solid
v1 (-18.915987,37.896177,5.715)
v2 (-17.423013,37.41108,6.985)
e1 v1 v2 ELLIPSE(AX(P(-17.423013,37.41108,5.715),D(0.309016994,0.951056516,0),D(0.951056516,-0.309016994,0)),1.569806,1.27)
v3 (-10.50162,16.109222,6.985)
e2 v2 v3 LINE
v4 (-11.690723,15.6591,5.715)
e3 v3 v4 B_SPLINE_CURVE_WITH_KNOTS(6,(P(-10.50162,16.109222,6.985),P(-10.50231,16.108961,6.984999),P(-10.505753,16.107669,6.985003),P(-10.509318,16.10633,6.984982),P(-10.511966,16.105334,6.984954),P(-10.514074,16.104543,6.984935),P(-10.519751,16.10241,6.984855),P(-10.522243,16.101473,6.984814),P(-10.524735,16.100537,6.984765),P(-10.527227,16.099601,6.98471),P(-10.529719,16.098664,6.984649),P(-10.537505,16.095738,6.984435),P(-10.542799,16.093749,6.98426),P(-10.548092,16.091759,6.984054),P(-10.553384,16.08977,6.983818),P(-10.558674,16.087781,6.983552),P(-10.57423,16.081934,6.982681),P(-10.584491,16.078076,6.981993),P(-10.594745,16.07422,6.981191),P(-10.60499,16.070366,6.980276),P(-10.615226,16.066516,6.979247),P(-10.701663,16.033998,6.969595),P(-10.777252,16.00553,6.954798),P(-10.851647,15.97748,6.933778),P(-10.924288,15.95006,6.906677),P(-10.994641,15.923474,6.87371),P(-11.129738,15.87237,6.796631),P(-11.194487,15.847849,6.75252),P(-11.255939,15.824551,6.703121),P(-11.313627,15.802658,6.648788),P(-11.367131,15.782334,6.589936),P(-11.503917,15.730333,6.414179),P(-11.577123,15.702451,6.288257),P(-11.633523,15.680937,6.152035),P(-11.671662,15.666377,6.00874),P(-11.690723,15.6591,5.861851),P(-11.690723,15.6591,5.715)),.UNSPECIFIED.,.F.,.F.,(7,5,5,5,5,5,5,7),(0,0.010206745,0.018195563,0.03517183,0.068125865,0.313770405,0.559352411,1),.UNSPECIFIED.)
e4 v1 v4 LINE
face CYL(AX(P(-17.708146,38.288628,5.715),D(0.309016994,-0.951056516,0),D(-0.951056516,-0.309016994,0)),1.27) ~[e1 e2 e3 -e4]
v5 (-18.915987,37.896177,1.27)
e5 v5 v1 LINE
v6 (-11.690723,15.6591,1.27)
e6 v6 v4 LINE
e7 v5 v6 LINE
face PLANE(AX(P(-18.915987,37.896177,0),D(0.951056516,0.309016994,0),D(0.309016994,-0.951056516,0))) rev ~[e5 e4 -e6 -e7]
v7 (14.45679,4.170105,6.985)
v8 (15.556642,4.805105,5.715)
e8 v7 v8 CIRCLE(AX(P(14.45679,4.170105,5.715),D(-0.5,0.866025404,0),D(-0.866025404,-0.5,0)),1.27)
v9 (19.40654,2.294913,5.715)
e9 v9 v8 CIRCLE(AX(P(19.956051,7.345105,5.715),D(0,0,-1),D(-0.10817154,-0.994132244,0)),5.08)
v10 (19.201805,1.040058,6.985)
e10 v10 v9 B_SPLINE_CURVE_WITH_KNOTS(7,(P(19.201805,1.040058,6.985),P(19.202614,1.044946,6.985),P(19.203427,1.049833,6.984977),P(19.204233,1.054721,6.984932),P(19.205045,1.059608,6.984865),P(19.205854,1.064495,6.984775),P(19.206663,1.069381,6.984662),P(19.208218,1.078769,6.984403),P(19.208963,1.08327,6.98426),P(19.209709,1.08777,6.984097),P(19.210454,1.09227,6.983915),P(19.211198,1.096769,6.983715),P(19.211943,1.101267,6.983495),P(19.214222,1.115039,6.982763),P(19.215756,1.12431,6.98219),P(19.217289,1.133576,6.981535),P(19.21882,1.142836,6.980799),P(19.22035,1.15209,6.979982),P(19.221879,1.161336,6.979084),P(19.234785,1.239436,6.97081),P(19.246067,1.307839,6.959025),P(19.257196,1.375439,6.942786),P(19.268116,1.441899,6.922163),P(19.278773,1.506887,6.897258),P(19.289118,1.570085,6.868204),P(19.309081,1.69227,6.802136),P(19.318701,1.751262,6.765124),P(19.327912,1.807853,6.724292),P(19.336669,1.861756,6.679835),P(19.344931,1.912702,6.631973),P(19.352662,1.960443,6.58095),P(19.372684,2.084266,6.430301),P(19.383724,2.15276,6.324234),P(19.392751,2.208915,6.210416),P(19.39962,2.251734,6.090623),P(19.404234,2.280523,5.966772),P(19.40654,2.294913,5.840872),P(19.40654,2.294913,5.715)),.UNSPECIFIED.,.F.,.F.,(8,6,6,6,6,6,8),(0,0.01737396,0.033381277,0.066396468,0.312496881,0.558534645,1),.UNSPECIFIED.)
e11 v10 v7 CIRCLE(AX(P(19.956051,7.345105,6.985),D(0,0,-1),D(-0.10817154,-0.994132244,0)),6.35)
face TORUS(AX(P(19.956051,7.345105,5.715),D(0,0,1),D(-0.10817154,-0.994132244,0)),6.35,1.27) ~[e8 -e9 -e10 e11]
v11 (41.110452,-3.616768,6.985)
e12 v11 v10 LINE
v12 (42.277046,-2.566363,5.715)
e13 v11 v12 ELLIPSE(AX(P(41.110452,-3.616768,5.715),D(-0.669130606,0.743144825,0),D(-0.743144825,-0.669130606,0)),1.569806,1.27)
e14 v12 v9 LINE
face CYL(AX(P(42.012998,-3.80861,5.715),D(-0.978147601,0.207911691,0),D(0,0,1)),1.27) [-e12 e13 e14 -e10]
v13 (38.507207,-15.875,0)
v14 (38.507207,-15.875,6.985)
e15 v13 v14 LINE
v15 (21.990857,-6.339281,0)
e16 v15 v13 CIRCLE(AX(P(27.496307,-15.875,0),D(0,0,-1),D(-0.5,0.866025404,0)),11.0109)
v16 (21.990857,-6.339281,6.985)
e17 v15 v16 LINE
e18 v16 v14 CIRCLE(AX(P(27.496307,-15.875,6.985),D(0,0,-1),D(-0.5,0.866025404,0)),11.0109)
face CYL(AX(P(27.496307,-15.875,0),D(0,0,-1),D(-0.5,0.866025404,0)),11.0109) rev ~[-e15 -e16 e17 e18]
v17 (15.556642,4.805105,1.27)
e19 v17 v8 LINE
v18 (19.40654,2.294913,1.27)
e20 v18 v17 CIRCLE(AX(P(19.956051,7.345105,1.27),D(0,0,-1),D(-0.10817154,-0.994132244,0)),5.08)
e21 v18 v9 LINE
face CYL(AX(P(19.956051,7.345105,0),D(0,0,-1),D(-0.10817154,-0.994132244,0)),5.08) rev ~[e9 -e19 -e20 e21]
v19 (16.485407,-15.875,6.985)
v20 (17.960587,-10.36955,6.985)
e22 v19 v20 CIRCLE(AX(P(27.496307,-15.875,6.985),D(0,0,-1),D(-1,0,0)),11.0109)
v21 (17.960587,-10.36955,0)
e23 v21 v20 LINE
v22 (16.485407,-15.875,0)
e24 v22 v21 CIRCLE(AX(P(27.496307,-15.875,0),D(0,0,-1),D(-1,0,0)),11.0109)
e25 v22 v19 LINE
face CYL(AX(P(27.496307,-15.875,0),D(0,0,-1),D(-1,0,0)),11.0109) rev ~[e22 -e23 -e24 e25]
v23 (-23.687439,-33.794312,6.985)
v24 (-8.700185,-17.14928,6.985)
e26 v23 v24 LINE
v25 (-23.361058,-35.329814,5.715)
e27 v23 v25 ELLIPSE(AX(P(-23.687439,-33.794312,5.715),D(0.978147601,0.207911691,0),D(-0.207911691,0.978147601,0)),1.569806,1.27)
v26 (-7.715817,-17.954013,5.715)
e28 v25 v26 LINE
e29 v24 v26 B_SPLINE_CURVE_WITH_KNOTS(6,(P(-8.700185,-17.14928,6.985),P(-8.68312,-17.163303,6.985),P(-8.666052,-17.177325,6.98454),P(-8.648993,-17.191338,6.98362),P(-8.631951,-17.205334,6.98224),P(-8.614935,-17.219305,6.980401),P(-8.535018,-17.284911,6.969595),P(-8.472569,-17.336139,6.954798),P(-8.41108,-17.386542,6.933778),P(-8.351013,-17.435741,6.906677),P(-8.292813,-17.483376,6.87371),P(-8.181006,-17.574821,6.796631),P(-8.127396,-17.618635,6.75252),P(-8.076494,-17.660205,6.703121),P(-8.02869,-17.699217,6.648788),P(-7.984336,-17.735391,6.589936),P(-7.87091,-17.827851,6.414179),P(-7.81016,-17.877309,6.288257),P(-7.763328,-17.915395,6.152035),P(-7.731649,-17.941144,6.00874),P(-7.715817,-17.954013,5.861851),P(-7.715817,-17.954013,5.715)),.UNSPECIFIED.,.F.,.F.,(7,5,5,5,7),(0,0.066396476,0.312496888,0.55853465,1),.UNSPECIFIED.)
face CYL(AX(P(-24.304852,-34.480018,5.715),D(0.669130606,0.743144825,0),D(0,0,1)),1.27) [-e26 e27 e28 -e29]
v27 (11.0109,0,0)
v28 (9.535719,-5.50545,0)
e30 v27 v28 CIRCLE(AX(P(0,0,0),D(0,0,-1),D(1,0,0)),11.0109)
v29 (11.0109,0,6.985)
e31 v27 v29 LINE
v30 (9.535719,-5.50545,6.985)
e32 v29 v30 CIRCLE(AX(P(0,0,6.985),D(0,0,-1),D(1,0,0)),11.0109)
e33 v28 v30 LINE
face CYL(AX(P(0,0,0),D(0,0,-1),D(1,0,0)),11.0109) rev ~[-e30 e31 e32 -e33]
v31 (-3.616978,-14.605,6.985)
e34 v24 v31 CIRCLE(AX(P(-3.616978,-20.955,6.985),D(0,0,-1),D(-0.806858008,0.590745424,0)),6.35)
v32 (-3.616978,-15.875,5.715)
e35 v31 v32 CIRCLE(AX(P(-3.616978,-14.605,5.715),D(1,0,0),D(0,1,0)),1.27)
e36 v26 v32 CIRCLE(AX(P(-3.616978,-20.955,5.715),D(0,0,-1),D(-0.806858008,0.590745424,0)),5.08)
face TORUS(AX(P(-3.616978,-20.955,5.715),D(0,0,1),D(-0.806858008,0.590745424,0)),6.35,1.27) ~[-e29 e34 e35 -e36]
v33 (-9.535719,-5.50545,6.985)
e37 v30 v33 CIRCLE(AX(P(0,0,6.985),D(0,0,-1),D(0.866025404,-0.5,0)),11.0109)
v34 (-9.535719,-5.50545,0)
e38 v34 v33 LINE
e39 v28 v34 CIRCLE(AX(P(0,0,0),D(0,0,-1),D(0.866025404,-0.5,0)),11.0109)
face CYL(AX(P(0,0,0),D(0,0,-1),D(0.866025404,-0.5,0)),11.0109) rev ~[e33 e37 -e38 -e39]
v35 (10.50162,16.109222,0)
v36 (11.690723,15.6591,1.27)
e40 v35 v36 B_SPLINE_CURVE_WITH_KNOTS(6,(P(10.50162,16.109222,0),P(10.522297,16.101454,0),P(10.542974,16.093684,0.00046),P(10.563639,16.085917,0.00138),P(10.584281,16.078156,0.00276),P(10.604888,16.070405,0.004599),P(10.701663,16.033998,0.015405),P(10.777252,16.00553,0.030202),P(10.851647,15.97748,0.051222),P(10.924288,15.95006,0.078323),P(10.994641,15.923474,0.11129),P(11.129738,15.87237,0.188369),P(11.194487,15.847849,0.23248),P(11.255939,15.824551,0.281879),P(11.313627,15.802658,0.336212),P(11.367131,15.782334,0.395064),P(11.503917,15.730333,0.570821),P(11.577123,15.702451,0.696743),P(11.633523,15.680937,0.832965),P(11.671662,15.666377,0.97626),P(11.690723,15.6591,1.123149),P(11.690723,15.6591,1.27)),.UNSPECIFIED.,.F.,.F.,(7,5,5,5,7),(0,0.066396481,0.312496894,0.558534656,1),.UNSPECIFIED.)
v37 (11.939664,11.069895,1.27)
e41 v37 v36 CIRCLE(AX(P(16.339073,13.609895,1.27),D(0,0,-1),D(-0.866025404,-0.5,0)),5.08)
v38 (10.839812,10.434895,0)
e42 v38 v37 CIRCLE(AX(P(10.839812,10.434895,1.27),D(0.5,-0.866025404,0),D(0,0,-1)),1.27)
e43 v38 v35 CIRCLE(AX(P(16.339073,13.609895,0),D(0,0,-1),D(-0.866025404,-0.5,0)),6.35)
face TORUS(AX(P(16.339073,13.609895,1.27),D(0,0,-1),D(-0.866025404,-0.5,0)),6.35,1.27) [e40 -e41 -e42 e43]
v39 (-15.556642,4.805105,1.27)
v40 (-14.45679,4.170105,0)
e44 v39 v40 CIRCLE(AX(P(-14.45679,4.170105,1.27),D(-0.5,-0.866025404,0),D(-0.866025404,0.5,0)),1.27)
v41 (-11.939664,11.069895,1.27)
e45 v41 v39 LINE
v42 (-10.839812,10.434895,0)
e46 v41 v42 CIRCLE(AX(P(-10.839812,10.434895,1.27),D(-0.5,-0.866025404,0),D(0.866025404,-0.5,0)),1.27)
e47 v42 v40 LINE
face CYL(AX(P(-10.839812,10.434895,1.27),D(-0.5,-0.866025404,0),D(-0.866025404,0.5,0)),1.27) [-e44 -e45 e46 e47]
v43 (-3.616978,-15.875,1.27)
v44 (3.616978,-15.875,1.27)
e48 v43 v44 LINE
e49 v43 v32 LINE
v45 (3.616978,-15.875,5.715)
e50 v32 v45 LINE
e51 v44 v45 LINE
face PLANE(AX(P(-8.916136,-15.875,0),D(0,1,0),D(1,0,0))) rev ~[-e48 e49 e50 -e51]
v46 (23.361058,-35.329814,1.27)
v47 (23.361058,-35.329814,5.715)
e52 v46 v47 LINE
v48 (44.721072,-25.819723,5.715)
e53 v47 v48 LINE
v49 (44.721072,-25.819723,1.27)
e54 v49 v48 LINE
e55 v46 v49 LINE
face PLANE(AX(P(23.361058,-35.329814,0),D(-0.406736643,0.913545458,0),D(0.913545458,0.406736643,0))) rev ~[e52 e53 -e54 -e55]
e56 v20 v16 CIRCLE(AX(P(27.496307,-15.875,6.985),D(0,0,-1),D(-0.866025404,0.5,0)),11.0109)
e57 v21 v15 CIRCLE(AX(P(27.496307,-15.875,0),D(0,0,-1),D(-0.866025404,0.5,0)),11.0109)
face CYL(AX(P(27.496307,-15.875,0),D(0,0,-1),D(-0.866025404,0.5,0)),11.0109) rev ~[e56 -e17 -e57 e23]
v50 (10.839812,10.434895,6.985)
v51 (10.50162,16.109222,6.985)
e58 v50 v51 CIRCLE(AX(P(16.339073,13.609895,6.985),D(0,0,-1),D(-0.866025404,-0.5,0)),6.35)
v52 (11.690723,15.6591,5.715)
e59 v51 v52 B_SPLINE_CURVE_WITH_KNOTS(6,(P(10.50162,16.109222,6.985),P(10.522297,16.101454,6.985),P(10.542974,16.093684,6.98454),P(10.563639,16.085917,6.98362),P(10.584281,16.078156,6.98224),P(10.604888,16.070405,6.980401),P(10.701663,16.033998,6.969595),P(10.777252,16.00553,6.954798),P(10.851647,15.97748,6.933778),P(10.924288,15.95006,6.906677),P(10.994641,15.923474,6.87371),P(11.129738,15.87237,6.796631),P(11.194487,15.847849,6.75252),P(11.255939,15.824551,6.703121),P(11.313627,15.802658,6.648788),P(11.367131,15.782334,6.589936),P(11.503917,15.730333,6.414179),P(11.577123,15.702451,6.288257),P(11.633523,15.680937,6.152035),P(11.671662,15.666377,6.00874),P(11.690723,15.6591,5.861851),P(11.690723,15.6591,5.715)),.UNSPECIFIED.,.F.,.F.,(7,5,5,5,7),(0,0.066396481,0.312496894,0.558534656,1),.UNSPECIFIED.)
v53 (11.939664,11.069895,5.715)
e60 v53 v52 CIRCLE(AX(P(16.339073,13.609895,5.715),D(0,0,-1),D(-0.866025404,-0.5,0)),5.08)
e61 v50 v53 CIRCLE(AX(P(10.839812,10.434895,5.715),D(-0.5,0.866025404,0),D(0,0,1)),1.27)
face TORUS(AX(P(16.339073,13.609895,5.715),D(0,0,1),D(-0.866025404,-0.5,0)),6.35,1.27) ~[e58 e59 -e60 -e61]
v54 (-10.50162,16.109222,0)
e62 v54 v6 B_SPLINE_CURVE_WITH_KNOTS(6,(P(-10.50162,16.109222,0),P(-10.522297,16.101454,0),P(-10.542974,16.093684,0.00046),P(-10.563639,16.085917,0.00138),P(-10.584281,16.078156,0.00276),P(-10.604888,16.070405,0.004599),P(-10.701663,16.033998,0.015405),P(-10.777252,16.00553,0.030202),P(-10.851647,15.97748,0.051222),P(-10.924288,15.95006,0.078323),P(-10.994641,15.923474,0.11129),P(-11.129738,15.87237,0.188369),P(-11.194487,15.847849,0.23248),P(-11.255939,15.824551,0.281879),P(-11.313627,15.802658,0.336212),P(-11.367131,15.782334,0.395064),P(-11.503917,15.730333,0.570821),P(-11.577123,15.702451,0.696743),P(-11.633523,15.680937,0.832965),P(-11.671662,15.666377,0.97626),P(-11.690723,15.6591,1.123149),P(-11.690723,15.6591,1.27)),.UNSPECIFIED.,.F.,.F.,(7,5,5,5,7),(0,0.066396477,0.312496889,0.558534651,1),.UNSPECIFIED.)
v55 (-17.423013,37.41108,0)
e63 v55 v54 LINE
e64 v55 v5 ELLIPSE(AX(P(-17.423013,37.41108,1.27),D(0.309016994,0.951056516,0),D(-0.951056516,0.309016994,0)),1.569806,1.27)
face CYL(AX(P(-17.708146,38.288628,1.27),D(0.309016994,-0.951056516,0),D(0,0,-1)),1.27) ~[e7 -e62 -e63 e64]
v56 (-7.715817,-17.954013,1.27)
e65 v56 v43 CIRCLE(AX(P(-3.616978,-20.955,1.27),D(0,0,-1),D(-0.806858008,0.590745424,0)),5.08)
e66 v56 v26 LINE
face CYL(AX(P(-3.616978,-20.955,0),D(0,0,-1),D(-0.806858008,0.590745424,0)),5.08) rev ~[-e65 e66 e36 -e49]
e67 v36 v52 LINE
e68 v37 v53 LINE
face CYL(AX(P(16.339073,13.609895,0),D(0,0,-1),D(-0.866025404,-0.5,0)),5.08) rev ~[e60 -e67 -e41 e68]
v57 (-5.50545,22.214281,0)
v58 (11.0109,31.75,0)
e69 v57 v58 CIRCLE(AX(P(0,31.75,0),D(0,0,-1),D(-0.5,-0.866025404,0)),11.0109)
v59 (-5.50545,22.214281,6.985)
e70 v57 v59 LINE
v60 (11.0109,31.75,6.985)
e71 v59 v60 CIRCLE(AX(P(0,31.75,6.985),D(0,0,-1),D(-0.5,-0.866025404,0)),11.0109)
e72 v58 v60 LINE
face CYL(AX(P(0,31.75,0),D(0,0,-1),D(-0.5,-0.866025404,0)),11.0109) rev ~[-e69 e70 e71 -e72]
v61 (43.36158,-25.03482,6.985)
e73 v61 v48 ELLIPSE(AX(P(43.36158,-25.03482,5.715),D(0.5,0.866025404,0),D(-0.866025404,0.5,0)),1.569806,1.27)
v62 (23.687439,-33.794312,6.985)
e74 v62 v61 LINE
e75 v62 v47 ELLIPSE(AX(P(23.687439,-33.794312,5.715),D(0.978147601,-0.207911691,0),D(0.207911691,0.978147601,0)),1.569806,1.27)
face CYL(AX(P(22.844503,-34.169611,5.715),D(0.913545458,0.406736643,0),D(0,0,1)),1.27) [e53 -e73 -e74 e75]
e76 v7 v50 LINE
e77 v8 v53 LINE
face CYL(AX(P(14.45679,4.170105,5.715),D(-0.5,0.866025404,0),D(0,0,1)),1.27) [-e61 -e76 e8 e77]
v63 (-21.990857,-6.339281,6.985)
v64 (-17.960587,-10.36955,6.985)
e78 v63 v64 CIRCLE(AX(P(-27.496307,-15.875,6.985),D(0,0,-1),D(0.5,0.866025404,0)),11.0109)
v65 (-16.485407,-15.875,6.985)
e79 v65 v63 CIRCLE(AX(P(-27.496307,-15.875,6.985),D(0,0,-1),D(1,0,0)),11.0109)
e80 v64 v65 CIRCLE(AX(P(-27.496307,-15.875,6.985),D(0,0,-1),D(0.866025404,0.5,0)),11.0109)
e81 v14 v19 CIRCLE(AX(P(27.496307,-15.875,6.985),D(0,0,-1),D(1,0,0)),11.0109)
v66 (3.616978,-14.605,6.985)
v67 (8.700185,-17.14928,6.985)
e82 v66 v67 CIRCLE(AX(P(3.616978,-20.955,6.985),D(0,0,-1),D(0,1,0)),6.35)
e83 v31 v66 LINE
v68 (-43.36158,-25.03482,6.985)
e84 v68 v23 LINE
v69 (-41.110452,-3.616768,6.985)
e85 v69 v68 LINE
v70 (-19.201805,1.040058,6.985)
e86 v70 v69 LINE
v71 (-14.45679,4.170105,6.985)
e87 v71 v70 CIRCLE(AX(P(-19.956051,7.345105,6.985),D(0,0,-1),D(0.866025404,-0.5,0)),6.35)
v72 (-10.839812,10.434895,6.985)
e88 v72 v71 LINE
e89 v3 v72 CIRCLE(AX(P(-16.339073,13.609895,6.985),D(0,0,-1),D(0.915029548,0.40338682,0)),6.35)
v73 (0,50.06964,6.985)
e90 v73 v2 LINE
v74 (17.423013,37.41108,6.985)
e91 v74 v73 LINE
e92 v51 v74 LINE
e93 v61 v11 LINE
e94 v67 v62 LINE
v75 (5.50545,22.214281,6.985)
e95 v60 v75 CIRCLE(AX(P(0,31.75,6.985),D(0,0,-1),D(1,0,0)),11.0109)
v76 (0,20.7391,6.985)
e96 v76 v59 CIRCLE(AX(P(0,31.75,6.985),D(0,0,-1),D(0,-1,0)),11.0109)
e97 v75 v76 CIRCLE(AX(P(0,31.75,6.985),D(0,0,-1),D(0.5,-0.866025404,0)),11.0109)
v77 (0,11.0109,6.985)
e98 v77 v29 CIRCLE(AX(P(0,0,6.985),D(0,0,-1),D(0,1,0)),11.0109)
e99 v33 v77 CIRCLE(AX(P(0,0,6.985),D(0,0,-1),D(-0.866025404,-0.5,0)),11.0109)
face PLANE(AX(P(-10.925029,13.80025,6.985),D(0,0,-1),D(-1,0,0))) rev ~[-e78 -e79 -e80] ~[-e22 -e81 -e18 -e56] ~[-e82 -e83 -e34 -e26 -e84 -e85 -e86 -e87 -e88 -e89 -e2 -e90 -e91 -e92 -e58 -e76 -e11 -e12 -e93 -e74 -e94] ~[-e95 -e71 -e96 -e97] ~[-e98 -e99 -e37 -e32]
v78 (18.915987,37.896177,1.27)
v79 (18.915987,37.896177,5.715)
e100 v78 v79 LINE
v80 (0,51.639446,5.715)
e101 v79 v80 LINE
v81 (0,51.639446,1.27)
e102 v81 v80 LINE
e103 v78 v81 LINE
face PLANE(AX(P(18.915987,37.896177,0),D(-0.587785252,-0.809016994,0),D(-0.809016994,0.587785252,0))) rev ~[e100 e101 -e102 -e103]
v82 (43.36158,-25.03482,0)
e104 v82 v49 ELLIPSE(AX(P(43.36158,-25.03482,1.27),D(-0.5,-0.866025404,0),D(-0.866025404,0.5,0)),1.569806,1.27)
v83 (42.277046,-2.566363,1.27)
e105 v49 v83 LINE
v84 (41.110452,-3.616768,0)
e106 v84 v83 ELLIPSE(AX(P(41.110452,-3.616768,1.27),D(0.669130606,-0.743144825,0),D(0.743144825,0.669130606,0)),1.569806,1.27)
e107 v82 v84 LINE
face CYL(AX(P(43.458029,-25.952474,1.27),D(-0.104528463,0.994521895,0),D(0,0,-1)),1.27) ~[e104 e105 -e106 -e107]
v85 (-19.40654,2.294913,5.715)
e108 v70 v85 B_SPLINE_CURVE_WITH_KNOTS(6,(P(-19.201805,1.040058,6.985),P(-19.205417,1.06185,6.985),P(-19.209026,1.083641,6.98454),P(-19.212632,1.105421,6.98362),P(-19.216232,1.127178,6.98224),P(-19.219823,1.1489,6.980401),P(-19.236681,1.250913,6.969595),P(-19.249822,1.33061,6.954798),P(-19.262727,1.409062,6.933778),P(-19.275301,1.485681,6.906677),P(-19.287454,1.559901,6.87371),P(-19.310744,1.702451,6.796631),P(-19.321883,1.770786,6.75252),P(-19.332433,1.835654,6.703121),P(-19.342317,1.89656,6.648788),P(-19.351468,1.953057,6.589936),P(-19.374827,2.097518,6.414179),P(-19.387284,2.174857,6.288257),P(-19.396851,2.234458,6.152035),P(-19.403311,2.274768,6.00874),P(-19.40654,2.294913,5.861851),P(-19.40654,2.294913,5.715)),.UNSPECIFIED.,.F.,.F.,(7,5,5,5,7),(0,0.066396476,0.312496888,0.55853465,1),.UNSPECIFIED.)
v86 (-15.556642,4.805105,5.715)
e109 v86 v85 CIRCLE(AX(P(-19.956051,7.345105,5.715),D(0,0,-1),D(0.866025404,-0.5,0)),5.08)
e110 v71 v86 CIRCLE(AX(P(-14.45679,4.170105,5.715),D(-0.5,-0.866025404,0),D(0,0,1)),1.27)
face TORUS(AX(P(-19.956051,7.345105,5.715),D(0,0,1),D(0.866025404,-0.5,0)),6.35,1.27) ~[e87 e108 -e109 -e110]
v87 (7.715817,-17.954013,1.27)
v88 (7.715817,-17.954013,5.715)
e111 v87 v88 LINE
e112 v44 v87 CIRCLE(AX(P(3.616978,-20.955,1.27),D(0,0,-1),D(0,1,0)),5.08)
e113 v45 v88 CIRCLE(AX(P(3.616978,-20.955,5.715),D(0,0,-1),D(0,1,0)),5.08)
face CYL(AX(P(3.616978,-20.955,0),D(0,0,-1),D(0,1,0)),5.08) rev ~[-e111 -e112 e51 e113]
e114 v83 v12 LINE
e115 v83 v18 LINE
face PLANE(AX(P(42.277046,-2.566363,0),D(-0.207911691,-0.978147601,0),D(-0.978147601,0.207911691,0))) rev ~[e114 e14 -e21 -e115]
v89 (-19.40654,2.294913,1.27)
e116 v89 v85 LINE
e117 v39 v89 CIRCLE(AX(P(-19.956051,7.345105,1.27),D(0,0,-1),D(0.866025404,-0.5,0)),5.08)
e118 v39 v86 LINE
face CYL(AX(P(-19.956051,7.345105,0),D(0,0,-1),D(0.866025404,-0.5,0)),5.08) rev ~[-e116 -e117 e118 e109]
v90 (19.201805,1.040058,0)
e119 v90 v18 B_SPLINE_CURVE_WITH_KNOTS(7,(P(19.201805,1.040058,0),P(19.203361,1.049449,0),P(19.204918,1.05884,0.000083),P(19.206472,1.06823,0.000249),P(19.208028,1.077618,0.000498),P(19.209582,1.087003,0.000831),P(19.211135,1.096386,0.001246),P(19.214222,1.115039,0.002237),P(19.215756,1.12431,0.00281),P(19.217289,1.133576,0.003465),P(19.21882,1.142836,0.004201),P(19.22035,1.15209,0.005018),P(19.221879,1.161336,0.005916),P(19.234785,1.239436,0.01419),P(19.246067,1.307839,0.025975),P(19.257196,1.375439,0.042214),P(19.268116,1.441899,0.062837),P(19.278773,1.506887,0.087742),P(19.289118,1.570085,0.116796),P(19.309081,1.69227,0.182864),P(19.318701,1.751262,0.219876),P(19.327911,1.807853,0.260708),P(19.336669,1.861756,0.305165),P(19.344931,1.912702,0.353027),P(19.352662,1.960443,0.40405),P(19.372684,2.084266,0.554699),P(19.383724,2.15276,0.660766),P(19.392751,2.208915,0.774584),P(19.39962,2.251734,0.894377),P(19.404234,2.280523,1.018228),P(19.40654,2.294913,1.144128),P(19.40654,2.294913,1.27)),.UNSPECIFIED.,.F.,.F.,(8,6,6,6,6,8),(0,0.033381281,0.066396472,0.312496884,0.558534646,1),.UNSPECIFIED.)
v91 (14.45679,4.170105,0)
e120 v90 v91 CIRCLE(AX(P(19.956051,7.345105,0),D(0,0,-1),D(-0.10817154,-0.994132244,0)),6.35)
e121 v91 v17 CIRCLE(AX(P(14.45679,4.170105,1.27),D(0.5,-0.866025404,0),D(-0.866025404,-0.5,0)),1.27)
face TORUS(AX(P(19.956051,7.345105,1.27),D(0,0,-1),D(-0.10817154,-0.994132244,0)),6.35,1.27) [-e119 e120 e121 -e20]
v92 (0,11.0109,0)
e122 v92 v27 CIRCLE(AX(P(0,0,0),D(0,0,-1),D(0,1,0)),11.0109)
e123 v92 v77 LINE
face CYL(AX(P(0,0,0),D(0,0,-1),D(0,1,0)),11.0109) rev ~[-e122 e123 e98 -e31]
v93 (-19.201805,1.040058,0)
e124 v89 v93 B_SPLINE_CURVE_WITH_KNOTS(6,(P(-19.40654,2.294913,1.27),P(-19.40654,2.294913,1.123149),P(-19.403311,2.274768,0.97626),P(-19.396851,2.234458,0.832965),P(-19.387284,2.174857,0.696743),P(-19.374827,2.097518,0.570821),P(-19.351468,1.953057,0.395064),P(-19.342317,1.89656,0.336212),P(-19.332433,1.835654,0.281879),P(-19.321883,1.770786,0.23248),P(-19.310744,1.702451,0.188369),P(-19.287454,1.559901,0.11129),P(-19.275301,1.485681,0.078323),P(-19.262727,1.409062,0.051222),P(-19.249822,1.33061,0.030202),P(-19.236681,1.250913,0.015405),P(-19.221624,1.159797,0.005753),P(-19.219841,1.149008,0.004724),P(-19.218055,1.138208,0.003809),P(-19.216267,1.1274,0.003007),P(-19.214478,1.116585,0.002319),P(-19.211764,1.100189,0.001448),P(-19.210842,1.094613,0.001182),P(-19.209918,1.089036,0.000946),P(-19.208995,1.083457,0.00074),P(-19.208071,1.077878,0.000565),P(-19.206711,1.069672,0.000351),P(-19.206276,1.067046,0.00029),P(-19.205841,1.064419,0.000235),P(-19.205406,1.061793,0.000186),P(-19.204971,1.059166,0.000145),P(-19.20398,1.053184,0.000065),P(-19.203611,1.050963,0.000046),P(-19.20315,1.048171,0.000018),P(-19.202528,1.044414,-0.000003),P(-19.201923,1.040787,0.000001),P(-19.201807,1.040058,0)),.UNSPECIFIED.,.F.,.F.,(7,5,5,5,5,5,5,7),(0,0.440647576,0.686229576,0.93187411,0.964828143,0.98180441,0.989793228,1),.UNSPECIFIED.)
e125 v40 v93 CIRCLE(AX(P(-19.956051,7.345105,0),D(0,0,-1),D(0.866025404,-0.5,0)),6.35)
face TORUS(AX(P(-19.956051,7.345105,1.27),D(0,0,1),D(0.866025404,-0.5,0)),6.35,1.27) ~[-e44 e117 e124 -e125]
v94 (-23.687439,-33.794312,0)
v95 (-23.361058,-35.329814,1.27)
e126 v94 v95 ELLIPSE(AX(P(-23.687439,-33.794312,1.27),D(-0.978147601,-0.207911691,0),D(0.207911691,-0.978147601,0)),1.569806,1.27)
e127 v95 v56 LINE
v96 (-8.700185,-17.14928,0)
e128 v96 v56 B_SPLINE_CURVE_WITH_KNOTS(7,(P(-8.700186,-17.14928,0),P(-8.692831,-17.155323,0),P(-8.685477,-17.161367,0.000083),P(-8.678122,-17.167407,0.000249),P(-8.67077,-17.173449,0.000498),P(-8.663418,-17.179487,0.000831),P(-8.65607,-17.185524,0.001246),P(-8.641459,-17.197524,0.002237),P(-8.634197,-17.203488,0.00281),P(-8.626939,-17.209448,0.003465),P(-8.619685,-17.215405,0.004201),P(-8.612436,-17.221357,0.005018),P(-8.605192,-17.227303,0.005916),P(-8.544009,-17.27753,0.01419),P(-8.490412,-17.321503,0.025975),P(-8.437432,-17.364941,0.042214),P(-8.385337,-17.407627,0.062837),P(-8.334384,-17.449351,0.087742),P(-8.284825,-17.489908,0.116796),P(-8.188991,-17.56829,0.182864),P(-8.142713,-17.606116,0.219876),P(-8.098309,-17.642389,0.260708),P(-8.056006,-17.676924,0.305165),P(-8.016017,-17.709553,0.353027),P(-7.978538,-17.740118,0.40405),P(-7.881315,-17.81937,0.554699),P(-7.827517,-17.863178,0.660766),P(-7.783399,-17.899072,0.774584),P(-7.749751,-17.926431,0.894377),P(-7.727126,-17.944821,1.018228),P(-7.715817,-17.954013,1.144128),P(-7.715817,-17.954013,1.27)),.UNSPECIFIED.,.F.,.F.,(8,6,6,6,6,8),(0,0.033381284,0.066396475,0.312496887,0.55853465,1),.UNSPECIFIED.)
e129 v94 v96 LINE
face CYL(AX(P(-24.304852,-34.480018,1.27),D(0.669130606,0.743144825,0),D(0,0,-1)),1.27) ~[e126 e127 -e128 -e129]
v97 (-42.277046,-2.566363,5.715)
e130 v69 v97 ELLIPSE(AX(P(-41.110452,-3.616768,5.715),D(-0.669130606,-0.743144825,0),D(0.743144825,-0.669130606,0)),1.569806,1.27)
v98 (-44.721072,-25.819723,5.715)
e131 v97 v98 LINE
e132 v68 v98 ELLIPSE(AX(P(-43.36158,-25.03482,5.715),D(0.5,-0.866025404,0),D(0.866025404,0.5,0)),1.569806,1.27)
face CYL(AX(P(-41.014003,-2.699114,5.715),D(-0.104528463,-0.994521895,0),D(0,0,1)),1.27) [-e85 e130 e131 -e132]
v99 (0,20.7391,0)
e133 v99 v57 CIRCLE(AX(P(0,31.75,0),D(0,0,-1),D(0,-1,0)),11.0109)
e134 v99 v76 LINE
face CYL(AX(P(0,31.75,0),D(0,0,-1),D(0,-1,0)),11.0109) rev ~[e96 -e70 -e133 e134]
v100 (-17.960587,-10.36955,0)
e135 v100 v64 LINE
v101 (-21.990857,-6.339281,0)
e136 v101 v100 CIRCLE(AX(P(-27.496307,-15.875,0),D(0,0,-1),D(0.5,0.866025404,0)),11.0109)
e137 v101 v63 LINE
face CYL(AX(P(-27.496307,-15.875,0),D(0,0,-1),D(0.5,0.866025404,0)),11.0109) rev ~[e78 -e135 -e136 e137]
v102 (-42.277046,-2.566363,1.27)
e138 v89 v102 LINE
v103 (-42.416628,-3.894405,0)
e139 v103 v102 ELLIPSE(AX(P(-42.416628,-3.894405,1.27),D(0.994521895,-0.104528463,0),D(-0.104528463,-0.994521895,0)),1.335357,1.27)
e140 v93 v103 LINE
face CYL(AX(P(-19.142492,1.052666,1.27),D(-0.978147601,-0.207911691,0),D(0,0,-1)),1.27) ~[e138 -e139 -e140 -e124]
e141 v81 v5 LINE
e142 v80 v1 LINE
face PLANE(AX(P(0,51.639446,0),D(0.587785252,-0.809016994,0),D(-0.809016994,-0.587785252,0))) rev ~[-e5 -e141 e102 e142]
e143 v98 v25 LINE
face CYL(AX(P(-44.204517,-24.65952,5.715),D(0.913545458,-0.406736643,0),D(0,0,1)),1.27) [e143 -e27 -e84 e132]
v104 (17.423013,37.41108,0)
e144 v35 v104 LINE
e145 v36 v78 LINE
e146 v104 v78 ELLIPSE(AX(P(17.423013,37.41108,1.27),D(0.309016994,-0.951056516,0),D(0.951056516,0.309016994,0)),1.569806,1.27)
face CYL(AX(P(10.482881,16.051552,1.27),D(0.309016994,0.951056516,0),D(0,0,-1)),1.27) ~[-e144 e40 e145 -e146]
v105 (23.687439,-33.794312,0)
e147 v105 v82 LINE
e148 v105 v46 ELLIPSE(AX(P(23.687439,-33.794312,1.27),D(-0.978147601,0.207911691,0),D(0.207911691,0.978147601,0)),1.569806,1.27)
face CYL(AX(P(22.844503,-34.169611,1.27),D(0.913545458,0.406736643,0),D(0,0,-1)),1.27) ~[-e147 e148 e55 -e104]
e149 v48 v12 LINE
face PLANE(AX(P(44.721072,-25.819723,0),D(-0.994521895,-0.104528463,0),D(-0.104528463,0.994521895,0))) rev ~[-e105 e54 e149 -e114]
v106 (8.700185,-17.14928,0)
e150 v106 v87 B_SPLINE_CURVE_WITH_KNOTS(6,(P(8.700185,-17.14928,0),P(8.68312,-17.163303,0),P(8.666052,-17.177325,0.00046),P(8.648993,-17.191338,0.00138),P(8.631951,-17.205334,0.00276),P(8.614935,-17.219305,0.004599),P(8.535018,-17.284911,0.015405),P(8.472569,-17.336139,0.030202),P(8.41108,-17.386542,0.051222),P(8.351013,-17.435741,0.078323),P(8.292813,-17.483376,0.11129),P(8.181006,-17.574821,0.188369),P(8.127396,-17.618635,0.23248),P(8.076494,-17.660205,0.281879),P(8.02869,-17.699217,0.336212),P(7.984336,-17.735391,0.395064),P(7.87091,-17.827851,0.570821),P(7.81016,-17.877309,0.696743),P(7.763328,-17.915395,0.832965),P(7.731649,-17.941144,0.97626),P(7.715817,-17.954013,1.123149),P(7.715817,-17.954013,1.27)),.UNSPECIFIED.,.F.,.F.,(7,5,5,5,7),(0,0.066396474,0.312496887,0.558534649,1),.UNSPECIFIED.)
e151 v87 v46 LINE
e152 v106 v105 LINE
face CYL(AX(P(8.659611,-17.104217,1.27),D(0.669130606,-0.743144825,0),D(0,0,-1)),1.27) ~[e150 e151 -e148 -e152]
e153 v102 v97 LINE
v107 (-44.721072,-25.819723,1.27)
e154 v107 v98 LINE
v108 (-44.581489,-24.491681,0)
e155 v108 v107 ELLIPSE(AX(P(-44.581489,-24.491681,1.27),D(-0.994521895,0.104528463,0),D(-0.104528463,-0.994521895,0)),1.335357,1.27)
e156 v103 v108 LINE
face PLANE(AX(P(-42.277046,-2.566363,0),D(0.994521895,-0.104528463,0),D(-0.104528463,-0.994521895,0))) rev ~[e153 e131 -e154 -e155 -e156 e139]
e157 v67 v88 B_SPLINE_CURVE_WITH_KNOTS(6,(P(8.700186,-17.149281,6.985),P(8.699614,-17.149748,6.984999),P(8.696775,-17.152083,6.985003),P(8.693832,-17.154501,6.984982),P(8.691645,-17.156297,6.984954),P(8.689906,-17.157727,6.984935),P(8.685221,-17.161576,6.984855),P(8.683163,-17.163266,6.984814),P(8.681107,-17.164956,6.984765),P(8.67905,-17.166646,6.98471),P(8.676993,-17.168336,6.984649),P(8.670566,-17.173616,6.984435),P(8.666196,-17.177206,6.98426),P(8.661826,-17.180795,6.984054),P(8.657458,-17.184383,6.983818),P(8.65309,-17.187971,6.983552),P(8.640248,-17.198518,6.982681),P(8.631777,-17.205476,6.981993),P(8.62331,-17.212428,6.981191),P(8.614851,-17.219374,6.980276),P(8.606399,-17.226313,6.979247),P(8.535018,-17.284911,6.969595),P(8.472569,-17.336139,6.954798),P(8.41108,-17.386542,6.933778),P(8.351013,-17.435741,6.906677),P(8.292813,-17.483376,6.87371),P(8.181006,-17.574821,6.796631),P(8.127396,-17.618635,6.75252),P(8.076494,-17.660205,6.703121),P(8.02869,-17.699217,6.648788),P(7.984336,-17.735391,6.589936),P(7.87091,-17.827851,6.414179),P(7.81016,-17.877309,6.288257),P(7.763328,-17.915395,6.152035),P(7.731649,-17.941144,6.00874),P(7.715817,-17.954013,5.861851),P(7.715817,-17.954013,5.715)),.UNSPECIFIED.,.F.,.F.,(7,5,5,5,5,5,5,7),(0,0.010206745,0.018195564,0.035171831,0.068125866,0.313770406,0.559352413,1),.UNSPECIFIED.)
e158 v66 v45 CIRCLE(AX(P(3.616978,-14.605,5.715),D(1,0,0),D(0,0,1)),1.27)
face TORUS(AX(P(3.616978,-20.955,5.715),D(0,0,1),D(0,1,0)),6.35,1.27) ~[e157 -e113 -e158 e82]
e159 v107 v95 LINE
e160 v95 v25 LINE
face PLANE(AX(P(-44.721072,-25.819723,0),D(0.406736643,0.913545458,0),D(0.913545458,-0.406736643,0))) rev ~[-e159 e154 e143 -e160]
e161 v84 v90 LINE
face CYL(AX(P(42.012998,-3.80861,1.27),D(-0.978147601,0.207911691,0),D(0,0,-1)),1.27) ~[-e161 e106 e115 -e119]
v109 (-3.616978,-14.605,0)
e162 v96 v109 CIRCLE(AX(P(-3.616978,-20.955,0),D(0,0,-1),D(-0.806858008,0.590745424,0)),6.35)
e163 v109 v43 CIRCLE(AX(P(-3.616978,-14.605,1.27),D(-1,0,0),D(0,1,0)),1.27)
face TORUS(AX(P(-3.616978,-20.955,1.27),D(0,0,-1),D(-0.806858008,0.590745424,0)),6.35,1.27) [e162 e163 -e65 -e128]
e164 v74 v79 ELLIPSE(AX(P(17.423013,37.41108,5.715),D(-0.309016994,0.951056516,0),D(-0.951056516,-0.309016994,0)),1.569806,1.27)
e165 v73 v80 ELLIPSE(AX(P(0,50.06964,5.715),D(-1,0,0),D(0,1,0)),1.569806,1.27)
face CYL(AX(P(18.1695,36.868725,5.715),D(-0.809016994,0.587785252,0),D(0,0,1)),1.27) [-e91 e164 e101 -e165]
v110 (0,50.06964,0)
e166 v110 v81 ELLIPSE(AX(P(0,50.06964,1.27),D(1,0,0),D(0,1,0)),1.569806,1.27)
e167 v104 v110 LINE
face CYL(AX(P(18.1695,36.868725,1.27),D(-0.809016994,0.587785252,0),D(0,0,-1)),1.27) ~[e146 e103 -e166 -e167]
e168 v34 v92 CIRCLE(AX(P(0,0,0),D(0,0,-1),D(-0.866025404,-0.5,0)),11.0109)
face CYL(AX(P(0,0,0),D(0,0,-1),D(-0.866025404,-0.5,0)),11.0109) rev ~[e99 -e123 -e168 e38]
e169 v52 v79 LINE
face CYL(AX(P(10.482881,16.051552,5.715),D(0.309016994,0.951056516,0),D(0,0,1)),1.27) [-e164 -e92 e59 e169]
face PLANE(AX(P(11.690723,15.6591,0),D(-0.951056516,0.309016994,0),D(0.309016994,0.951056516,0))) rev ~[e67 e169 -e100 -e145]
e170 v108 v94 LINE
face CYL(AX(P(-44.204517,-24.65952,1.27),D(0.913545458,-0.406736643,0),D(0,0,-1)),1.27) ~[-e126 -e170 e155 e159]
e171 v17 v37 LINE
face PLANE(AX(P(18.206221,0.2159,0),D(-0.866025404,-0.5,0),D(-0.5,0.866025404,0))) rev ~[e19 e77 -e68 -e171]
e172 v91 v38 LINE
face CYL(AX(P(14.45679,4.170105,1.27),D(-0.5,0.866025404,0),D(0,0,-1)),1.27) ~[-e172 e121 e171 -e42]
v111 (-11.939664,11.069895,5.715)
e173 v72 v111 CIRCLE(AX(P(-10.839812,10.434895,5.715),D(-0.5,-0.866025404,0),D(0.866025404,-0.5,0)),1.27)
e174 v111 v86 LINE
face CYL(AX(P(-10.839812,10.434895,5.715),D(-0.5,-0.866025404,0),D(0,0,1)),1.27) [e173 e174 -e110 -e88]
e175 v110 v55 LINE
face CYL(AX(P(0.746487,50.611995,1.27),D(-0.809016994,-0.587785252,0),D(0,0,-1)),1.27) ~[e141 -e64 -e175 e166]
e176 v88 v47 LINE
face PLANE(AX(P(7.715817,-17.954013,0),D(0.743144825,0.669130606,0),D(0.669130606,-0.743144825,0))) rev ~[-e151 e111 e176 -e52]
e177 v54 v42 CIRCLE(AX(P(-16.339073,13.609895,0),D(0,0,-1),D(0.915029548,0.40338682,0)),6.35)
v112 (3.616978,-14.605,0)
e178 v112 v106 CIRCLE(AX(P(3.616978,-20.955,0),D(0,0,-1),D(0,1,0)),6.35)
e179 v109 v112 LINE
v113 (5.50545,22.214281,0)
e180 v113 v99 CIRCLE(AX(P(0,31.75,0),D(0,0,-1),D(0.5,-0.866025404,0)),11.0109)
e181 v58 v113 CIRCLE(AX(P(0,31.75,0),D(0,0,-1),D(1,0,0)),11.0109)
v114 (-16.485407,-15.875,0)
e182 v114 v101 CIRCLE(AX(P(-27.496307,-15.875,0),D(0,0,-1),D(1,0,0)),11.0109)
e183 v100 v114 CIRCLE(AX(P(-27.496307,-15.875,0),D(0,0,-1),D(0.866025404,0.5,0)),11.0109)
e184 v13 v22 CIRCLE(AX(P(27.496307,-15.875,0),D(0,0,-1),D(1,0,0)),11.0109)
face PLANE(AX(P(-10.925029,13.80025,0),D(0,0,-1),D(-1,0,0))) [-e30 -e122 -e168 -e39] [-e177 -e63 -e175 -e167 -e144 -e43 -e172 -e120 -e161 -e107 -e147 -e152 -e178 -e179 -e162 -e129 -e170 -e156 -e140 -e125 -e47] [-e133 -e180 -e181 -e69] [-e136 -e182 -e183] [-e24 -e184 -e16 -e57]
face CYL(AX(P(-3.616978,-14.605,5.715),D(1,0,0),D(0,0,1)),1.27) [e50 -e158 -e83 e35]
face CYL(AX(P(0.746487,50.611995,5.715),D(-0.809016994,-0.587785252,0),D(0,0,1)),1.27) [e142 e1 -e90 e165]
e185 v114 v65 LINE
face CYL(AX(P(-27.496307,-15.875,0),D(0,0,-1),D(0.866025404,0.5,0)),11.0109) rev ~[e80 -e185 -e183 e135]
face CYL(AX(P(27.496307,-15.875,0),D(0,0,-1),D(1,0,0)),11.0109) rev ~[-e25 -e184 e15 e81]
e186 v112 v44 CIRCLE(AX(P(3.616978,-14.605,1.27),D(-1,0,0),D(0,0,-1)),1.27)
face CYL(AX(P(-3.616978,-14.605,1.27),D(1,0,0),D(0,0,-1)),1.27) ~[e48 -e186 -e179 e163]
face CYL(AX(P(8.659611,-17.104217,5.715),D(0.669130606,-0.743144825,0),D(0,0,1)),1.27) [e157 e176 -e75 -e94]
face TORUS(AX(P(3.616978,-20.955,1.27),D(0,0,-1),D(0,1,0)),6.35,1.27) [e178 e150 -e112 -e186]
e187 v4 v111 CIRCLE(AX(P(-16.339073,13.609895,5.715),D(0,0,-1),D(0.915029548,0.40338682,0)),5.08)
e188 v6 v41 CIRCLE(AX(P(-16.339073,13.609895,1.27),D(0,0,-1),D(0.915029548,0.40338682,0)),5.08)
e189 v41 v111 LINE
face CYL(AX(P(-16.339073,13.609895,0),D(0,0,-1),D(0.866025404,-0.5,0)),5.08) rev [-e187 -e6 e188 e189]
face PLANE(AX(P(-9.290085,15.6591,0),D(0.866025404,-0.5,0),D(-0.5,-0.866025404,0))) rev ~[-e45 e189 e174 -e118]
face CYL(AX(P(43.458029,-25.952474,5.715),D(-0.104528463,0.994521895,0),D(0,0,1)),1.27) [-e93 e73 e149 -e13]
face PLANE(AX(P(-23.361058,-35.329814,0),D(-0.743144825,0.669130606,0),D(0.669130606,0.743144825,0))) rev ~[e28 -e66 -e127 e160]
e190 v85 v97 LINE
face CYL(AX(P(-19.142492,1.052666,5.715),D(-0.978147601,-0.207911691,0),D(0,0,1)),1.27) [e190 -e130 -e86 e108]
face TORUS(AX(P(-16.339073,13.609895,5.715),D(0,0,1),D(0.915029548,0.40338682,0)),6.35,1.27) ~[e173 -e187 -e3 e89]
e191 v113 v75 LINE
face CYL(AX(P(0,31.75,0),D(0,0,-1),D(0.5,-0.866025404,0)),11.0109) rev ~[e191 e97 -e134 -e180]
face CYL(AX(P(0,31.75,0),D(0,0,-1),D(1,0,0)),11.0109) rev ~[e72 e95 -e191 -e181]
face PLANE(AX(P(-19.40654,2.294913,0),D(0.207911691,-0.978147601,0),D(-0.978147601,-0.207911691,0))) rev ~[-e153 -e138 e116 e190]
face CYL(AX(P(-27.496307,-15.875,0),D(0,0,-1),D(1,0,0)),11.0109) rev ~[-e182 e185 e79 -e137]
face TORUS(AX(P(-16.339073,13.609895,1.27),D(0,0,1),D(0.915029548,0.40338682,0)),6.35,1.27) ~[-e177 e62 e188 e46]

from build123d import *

# Parameters (mm, degrees)
F1_DEPTH    = 6.985
F2_T1_DEPTH = 6.985
F3_R        = 1.27
F4_R        = 1.27


# Not quite as in the source:
# - a fillet or chamfer that OpenCascade refuses, or shapes differently, is made with other operations: its cross-section is extruded or revolved along the edge and cut away or added
# - a feature names something its author has since deleted; it is built from what else it names


with BuildPart() as f1:
    # F0 (on Top) → F1 (new body)
    with BuildSketch(Plane.XY):
        with BuildLine():
            Line((0, 15.6591), (0, 11.0109))
            ThreePointArc((0, 11.0109), (7.785882057, 7.785882057), (11.0109, 0))
            ThreePointArc((11.0109, 0), (10.6357126807, -2.8498306237), (9.5357191185, -5.50545))
            Line((9.5357191185, -5.50545), (13.5611784004, -7.82955))
            Line((13.5611784004, -7.82955), (18.2062211237, 0.2159))
            Line((18.2062211237, 0.2159), (9.2900854465, 15.6591))
            Line((9.2900854465, 15.6591), (0, 15.6591))
        make_face()
        with BuildLine():
            ThreePointArc((-9.5357191185, -5.50545), (-9.5357191185, 5.50545), (0, 11.0109))
            Line((0, 11.0109), (0, 15.6591))
            Line((0, 15.6591), (-9.2900854465, 15.6591))
            Line((-9.2900854465, 15.6591), (-18.2062211237, 0.2159))
            Line((-18.2062211237, 0.2159), (-13.5611784004, -7.82955))
            Line((-13.5611784004, -7.82955), (-9.5357191185, -5.50545))
        make_face()
        with BuildLine():
            Line((13.5611784004, -7.82955), (9.5357191185, -5.50545))
            ThreePointArc((9.5357191185, -5.50545), (0, -11.0109), (-9.5357191185, -5.50545))
            Line((-9.5357191185, -5.50545), (-13.5611784004, -7.82955))
            Line((-13.5611784004, -7.82955), (-8.9161356771, -15.875))
            Line((-8.9161356771, -15.875), (8.9161356771, -15.875))
            Line((8.9161356771, -15.875), (13.5611784004, -7.82955))
        make_face()
        with BuildLine():
            Line((-9.2900854465, 15.6591), (0, 15.6591))
            Line((0, 15.6591), (0, 20.7391))
            ThreePointArc((0, 20.7391), (-2.8498306237, 21.1142873193), (-5.50545, 22.2142808815))
            Line((-5.50545, 22.2142808815), (-9.2900854465, 15.6591))
        make_face()
        with BuildLine():
            Line((0, 20.7391), (0, 15.6591))
            Line((0, 15.6591), (9.2900854465, 15.6591))
            Line((9.2900854465, 15.6591), (5.50545, 22.2142808815))
            ThreePointArc((5.50545, 22.2142808815), (2.8498306237, 21.1142873193), (0, 20.7391))
        make_face()
        with BuildLine():
            Line((18.2062211237, 0.2159), (13.5611784004, -7.82955))
            Line((13.5611784004, -7.82955), (17.9605874516, -10.36955))
            ThreePointArc((17.9605874516, -10.36955), (19.7104245132, -8.089117943), (21.9908565702, -6.3392808815))
            Line((21.9908565702, -6.3392808815), (18.2062211237, 0.2159))
        make_face()
        with BuildLine():
            Line((17.9605874516, -10.36955), (13.5611784004, -7.82955))
            Line((13.5611784004, -7.82955), (8.9161356771, -15.875))
            Line((8.9161356771, -15.875), (16.4854065702, -15.875))
            ThreePointArc((16.4854065702, -15.875), (16.8605938895, -13.0251693763), (17.9605874516, -10.36955))
        make_face()
        with BuildLine():
            Line((-8.9161356771, -15.875), (-13.5611784004, -7.82955))
            Line((-13.5611784004, -7.82955), (-17.9605874516, -10.36955))
            ThreePointArc((-17.9605874516, -10.36955), (-16.8605938895, -13.0251693763), (-16.4854065702, -15.875))
            Line((-16.4854065702, -15.875), (-8.9161356771, -15.875))
        make_face()
        with BuildLine():
            Line((-17.9605874516, -10.36955), (-13.5611784004, -7.82955))
            Line((-13.5611784004, -7.82955), (-18.2062211237, 0.2159))
            Line((-18.2062211237, 0.2159), (-21.9908565702, -6.3392808815))
            ThreePointArc((-21.9908565702, -6.3392808815), (-19.7104245132, -8.089117943), (-17.9605874516, -10.36955))
        make_face()
        with BuildLine():
            Line((5.50545, 22.2142808815), (9.2900854465, 15.6591))
            Line((9.2900854465, 15.6591), (11.6907231639, 15.6591))
            Line((11.6907231639, 15.6591), (18.9159874322, 37.8961768904))
            Line((18.9159874322, 37.8961768904), (0, 51.6394462192))
            Line((0, 51.6394462192), (-18.9159874322, 37.8961768904))
            Line((-18.9159874322, 37.8961768904), (-11.6907231639, 15.6591))
            Line((-11.6907231639, 15.6591), (-9.2900854465, 15.6591))
            Line((-9.2900854465, 15.6591), (-5.50545, 22.2142808815))
            ThreePointArc((-5.50545, 22.2142808815), (-5.50545, 41.2857191185), (11.0109, 31.75))
            ThreePointArc((11.0109, 31.75), (9.5357191185, 26.24455), (5.50545, 22.2142808815))
        make_face()
        with BuildLine():
            Line((16.4854065702, -15.875), (8.9161356771, -15.875))
            Line((8.9161356771, -15.875), (7.7158168185, -17.9540132485))
            Line((7.7158168185, -17.9540132485), (23.3610581773, -35.3298140992))
            Line((23.3610581773, -35.3298140992), (44.7210722631, -25.8197231096))
            Line((44.7210722631, -25.8197231096), (42.2770456095, -2.5663627912))
            Line((42.2770456095, -2.5663627912), (19.4065399823, 2.2949132485))
            Line((19.4065399823, 2.2949132485), (18.2062211237, 0.2159))
            Line((18.2062211237, 0.2159), (21.9908565702, -6.3392808815))
            ThreePointArc((21.9908565702, -6.3392808815), (33.0017565702, -6.3392808815), (38.5072065702, -15.875))
            ThreePointArc((38.5072065702, -15.875), (27.4963065702, -26.8859), (16.4854065702, -15.875))
        make_face()
        with BuildLine():
            Line((-21.9908565702, -6.3392808815), (-18.2062211237, 0.2159))
            Line((-18.2062211237, 0.2159), (-19.4065399823, 2.2949132485))
            Line((-19.4065399823, 2.2949132485), (-42.2770456095, -2.5663627912))
            Line((-42.2770456095, -2.5663627912), (-44.7210722631, -25.8197231096))
            Line((-44.7210722631, -25.8197231096), (-23.3610581773, -35.3298140992))
            Line((-23.3610581773, -35.3298140992), (-7.7158168185, -17.9540132485))
            Line((-7.7158168185, -17.9540132485), (-8.9161356771, -15.875))
            Line((-8.9161356771, -15.875), (-16.4854065702, -15.875))
            ThreePointArc((-16.4854065702, -15.875), (-37.0320256887, -21.38045), (-21.9908565702, -6.3392808815))
        make_face()
    extrude(amount=F1_DEPTH)

    # F2: fillet of radius 5.08 on 6 edges, made by hand

    # F2_s2 → F2_t1 (join)
    with BuildSketch(Plane.XY):
        with BuildLine():
            ThreePointArc((-11.9396642154, 11.0698949536), (-11.2665307911, 13.3347353028), (-11.6907231639, 15.6591))
            Line((-11.6907231639, 15.6591), (-9.2900854465, 15.6591))
            Line((-9.2900854465, 15.6591), (-11.9396642154, 11.0698949536))
        make_face()
        with BuildLine():
            ThreePointArc((-15.5566423547, 4.8051050464), (-17.1814849205, 3.0897342262), (-19.4065399823, 2.2949132485))
            Line((-19.4065399823, 2.2949132485), (-18.2062211237, 0.2159))
            Line((-18.2062211237, 0.2159), (-15.5566423547, 4.8051050464))
        make_face()
        with BuildLine():
            ThreePointArc((-7.7158168185, -17.9540132485), (-5.9149541295, -16.424469529), (-3.6169781393, -15.875))
            Line((-3.6169781393, -15.875), (-8.9161356771, -15.875))
            Line((-8.9161356771, -15.875), (-7.7158168185, -17.9540132485))
        make_face()
        with BuildLine():
            ThreePointArc((3.6169781393, -15.875), (5.9149541295, -16.424469529), (7.7158168185, -17.9540132485))
            Line((7.7158168185, -17.9540132485), (8.9161356771, -15.875))
            Line((8.9161356771, -15.875), (3.6169781393, -15.875))
        make_face()
        with BuildLine():
            ThreePointArc((19.4065399823, 2.2949132485), (17.1814849205, 3.0897342262), (15.5566423547, 4.8051050464))
            Line((15.5566423547, 4.8051050464), (18.2062211237, 0.2159))
            Line((18.2062211237, 0.2159), (19.4065399823, 2.2949132485))
        make_face()
        with BuildLine():
            ThreePointArc((11.9396642154, 11.0698949536), (11.2665307911, 13.3347353028), (11.6907231639, 15.6591))
            Line((11.6907231639, 15.6591), (9.2900854465, 15.6591))
            Line((9.2900854465, 15.6591), (11.9396642154, 11.0698949536))
        make_face()
    extrude(amount=F2_T1_DEPTH)

    # F3
    f3_edges = [f1.edges().sort_by_distance(p)[0] for p in [
        (9.457994, 44.767812, 6.985),
        (15.303355, 26.777638, 6.985),
        (13.748153, 7.9375, 6.985),
        (11.266531, 13.334735, 6.985),
        (17.181485, 3.089734, 6.985),
        (30.841793, -0.135725, 6.985),
        (43.499059, -14.193043, 6.985),
        (34.041065, -30.574769, 6.985),
        (15.538437, -26.641914, 6.985),
        (0, -15.875, 6.985),
        (-5.914954, -16.42447, 6.985),
        (-15.538437, -26.641914, 6.985),
        (-34.041065, -30.574769, 6.985),
        (-43.499059, -14.193043, 6.985),
        (-30.841793, -0.135725, 6.985),
        (-17.181485, 3.089734, 6.985),
        (-13.748153, 7.9375, 6.985),
        (-11.266531, 13.334735, 6.985),
        (-15.303355, 26.777638, 6.985),
        (-9.457994, 44.767812, 6.985),
        (5.914954, -16.42447, 6.985),
    ]]
    fillet(f3_edges, radius=F3_R)

    # F4
    f4_edges = [f1.edges().sort_by_distance(p)[0] for p in [
        (43.499059, -14.193043, 0),
        (34.041065, -30.574769, 0),
        (15.538437, -26.641914, 0),
        (30.841793, -0.135725, 0),
        (15.303355, 26.777638, 0),
        (9.457994, 44.767812, 0),
        (-9.457994, 44.767812, 0),
        (-15.303355, 26.777638, 0),
        (-13.748153, 7.9375, 0),
        (-30.841793, -0.135725, 0),
        (-34.041065, -30.574769, 0),
        (-15.538437, -26.641914, 0),
        (0, -15.875, 0),
        (13.748153, 7.9375, 0),
        (11.266531, 13.334735, 0),
        (-11.266531, 13.334735, 0),
        (17.181485, 3.089734, 0),
        (-17.181485, 3.089734, 0),
        (5.914954, -16.42447, 0),
        (-5.914954, -16.42447, 0),
    ]]
    fillet(f4_edges, radius=F4_R)


solid = f1.part
